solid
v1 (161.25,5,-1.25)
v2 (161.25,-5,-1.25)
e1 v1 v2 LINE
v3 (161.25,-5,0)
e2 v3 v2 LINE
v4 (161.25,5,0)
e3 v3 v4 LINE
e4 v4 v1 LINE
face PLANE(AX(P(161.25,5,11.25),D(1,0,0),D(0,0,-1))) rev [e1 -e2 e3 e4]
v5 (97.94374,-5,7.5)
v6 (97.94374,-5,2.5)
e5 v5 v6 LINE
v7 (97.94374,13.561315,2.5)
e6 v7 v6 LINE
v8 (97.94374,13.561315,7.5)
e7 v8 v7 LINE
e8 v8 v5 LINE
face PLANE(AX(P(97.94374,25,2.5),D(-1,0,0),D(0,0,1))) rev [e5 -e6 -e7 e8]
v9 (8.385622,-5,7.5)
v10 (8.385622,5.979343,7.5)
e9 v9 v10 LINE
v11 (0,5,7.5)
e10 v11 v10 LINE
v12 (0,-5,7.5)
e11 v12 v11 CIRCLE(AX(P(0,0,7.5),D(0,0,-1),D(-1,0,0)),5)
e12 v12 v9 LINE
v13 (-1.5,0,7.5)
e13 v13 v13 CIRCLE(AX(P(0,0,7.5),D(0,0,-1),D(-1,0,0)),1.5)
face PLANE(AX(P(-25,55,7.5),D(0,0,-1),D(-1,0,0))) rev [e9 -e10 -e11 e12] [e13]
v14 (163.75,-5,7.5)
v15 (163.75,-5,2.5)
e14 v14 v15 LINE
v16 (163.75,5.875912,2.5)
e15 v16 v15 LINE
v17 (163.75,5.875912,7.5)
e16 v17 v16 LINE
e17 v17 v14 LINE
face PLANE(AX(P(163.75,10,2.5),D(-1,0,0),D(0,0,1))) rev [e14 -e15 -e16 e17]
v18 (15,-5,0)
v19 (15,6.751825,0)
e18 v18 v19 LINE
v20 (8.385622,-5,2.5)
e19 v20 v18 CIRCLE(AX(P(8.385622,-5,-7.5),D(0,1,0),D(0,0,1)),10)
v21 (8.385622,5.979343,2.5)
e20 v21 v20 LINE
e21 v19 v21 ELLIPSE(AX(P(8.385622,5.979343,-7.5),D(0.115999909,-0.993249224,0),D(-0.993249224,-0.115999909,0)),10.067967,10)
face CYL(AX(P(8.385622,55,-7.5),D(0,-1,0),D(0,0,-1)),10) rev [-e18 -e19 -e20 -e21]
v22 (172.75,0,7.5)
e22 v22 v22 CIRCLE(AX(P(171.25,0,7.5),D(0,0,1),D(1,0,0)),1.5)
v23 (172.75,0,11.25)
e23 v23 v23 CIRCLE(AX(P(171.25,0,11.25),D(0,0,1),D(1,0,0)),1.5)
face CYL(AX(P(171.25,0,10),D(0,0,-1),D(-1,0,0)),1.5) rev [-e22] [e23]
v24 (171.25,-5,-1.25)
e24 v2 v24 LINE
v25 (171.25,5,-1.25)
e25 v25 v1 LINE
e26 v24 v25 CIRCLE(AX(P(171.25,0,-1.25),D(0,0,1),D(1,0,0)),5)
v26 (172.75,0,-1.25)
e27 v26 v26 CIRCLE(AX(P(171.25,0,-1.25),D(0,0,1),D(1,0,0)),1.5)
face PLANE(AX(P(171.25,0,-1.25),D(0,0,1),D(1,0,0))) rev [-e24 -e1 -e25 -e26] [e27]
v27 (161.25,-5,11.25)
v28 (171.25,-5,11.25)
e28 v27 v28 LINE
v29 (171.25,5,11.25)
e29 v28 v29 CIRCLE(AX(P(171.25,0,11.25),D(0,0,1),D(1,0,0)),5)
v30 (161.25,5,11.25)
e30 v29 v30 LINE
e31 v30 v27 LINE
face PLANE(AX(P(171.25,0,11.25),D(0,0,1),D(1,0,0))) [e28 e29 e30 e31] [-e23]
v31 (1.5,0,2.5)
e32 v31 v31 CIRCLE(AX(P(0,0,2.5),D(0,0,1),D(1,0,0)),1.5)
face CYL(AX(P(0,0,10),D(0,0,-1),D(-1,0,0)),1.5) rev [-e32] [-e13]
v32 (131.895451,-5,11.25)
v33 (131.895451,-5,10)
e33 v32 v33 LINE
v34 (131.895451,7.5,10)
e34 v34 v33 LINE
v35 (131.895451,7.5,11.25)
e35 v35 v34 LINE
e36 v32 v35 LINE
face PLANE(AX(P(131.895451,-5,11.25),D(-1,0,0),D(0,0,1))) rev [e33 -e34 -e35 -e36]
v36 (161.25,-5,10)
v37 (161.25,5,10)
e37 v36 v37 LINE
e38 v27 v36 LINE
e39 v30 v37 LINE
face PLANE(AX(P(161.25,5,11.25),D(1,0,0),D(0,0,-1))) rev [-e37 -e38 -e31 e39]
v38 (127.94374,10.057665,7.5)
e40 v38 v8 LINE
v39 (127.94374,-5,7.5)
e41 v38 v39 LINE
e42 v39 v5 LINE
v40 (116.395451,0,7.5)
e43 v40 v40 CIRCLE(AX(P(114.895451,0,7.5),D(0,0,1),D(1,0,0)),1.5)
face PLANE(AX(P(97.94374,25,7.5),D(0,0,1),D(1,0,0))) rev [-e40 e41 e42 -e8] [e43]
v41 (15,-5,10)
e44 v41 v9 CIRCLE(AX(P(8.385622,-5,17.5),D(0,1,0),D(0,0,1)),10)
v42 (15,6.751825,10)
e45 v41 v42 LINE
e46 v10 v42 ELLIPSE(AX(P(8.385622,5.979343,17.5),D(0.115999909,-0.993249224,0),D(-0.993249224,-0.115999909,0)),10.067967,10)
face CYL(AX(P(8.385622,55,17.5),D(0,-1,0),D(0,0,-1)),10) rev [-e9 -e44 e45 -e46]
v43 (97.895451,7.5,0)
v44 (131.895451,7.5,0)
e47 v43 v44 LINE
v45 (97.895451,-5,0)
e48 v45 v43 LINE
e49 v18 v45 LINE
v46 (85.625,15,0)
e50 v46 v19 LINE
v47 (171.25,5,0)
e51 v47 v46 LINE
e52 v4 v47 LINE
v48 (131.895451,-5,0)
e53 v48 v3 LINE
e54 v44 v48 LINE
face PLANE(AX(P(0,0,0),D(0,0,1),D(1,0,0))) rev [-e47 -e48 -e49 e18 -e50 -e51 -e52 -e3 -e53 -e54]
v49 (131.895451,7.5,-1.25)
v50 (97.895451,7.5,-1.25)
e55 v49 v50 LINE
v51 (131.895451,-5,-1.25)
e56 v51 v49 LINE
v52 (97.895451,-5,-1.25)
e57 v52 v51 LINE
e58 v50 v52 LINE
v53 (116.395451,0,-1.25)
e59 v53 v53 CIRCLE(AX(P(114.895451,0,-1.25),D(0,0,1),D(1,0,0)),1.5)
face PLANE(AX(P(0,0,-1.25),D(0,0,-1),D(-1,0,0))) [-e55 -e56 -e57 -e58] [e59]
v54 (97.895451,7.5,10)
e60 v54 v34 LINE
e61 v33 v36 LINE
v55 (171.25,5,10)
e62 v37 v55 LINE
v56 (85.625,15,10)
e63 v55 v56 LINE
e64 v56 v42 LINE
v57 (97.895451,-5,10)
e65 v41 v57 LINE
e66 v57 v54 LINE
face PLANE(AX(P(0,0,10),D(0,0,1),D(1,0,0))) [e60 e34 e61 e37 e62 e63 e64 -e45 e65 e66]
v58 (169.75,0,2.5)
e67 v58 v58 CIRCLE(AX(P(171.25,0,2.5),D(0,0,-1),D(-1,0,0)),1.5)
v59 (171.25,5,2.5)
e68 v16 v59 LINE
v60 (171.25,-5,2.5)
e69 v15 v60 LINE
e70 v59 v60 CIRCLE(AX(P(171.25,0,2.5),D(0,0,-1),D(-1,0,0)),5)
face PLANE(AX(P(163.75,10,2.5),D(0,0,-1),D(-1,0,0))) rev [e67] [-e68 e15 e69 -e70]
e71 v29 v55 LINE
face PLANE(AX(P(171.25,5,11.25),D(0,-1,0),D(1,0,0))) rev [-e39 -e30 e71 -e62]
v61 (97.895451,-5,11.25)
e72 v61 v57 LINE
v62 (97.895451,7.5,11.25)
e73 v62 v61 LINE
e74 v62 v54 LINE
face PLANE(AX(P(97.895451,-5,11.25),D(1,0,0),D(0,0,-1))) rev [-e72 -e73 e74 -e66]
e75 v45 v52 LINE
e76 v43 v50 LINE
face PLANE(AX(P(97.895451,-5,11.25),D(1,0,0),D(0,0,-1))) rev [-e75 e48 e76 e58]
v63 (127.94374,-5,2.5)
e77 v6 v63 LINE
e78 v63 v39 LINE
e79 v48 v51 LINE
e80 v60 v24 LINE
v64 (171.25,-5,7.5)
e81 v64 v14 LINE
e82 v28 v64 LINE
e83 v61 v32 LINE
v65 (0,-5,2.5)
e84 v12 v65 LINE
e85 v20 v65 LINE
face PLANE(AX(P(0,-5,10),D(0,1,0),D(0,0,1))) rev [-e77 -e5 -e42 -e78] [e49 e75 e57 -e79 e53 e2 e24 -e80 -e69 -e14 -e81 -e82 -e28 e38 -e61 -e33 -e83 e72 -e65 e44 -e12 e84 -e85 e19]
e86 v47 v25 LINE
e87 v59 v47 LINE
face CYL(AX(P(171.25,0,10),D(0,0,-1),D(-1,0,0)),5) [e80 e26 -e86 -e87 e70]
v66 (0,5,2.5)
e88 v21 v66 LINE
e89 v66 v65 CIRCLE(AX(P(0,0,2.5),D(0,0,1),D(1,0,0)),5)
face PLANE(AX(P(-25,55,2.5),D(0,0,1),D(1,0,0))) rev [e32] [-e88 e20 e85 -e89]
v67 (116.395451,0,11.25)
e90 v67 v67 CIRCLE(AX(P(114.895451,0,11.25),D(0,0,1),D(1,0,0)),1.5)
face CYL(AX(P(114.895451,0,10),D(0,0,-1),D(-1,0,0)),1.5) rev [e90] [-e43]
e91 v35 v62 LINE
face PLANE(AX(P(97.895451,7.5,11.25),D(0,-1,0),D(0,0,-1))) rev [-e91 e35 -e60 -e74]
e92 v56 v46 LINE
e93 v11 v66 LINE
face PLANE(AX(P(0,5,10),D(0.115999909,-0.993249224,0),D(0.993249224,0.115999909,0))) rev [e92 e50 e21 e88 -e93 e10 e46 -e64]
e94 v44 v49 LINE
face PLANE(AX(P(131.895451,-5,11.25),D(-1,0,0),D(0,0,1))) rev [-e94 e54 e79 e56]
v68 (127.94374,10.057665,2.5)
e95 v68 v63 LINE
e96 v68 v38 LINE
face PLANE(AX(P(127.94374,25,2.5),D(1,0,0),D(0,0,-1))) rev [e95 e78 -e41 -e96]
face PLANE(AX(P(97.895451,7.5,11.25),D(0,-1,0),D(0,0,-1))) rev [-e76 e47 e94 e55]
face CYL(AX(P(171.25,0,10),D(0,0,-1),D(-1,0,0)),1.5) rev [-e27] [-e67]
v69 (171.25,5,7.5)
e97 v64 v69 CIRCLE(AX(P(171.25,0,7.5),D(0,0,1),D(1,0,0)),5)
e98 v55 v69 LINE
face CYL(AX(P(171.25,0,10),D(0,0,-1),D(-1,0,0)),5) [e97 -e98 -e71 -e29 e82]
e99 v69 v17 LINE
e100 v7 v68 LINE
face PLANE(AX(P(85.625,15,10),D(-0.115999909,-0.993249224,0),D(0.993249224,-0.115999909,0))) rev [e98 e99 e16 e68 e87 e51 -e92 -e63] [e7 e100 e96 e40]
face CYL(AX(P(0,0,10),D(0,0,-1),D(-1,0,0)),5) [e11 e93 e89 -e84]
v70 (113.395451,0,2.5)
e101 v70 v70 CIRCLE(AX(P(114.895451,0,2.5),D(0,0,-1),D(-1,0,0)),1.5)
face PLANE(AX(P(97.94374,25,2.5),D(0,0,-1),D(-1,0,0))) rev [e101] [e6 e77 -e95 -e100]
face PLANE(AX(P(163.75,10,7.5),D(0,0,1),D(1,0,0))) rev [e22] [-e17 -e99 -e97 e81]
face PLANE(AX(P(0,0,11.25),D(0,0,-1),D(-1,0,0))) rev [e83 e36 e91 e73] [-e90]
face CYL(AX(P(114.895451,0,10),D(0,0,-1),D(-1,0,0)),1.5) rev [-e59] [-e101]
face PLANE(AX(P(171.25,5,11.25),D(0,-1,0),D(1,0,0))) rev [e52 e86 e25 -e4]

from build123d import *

# Parameters (mm, degrees)
CROQUIS1_R              = 1.5
SALIENTE_EXTRUIR1_DEPTH = 10
CROQUIS2_R              = 1.5
CROQUIS2_W              = 34
CROQUIS2_H              = 12.5
SALIENTE_EXTRUIR2_DEPTH = 6.25
CROQUIS3_W              = 25
CROQUIS3_H              = 5
CORTAR_EXTRUIR1_DEPTH   = 15
CROQUIS4_W              = 30
CROQUIS4_H              = 5
CORTAR_EXTRUIR2_DEPTH   = 30
CROQUIS6_W              = 40
CROQUIS6_H              = 7.662708713
CORTAR_EXTRUIR3_DEPTH   = 60
REDONDEO1_R             = 10


with BuildPart() as part:
    # Croquis1 → Saliente-Extruir1 (new body)
    with BuildSketch(Plane.XY):
        with BuildLine():
            Line((0, -5), (171.25, -5))
            ThreePointArc((171.25, -5), (176.25, 0), (171.25, 5))
            Line((171.25, 5), (85.625, 15))
            Line((85.625, 15), (0, 5))
            ThreePointArc((0, 5), (-5, 0), (0, -5))
        make_face()
        with Locations((171.25, 0)):
            Circle(CROQUIS1_R, mode=Mode.SUBTRACT)
        Circle(CROQUIS1_R, mode=Mode.SUBTRACT)
        with Locations((114.8954508, 0)):
            Circle(CROQUIS1_R, mode=Mode.SUBTRACT)
    extrude(amount=SALIENTE_EXTRUIR1_DEPTH)

    # Croquis2 → Saliente-Extruir2 (add, symmetric)
    # profile 1 of 2: a face of its own
    with BuildSketch(Plane.XY.offset(5)):
        with BuildLine():
            Line((171.25, 5), (161.25, 5))
            Line((161.25, 5), (161.25, -5))
            Line((161.25, -5), (171.25, -5))
            ThreePointArc((171.25, -5), (176.25, 0), (171.25, 5))
        make_face()
        with Locations((171.25, 0)):
            Circle(CROQUIS2_R, mode=Mode.SUBTRACT)
    # profile 2 of 2: a face of its own
    with BuildSketch(Plane.XY.offset(5)):
        with Locations((114.8954508, 1.25)):
            Rectangle(CROQUIS2_W, CROQUIS2_H)
        with Locations((114.8954508, 0)):
            Circle(CROQUIS2_R, mode=Mode.SUBTRACT)
    extrude(amount=SALIENTE_EXTRUIR2_DEPTH, both=True)

    # Croquis3 → Cortar-Extruir1 (cut)
    with BuildSketch(Plane.XZ.offset(5)):
        with Locations((176.25, 5)):
            Rectangle(CROQUIS3_W, CROQUIS3_H)
    extrude(amount=-CORTAR_EXTRUIR1_DEPTH, mode=Mode.SUBTRACT)

    # Croquis4 → Cortar-Extruir2 (cut)
    with BuildSketch(Plane.XZ.offset(5)):
        with Locations((112.94374, 5)):
            Rectangle(CROQUIS4_W, CROQUIS4_H)
    extrude(amount=-CORTAR_EXTRUIR2_DEPTH, mode=Mode.SUBTRACT)

    # Croquis6 → Cortar-Extruir3 (cut)
    with BuildSketch(Plane.XZ.offset(5)):
        with Locations((-5, 11.331354357)):
            Rectangle(CROQUIS6_W, CROQUIS6_H)
        with Locations((-5, -1.331354357)):
            Rectangle(CROQUIS6_W, CROQUIS6_H)
    extrude(amount=-CORTAR_EXTRUIR3_DEPTH, mode=Mode.SUBTRACT)

    # Redondeo1
    # the kernel refuses this fillet: 10 mm, written as the material it adds along each edge
    with BuildSketch(Plane(origin=(15, -5, 2.5), x_dir=(-1, 0, 0), z_dir=(0, 1, 0))) as redondeo1_piece_1_section:
        with BuildLine():
            CenterArc((6.614378278, -10), REDONDEO1_R, 90, 41.409622109)
            Line((0, -2.5), (-0.132287566, -2.35))
            ThreePointArc((-0.132287566, -2.35), (-0.2, -1.25), (-0.2, 0))
            Line((-0.2, 0), (0, 0.2))
            Line((0, 0.2), (6.614378278, 0.2))
            Line((6.614378278, 0.2), (6.614378278, 0))
        make_face()
    redondeo1_piece_1 = extrude(amount=28.287770512, mode=Mode.PRIVATE)
    redondeo1_piece_1 = split(redondeo1_piece_1, bisect_by=Plane(origin=(12.547080383, 6.465352453, 1.89633879), z_dir=(0.11599990937510621, -0.9932492240243469, 0)), keep=Keep.TOP, mode=Mode.PRIVATE)
    add(redondeo1_piece_1)
    with BuildSketch(Plane(origin=(15, -5, 7.5), x_dir=(0, 0, 1), z_dir=(0, 1, 0))) as redondeo1_piece_2_section:
        with BuildLine():
            CenterArc((10, -6.614378278), REDONDEO1_R, 138.590377891, 41.409622109)
            Line((0, -6.614378278), (-0.2, -6.614378278))
            Line((-0.2, -6.614378278), (-0.2, 0))
            Line((-0.2, 0), (0, 0.2))
            ThreePointArc((0, 0.2), (1.25, 0.2), (2.35, 0.132287566))
            Line((2.35, 0.132287566), (2.5, 0))
        make_face()
    redondeo1_piece_2 = extrude(amount=28.287770512, mode=Mode.PRIVATE)
    redondeo1_piece_2 = split(redondeo1_piece_2, bisect_by=Plane(origin=(12.547080383, 6.465352453, 8.10366121), z_dir=(0.11599990937510621, -0.9932492240243469, 0)), keep=Keep.TOP, mode=Mode.PRIVATE)
    add(redondeo1_piece_2)


solid = part.part
